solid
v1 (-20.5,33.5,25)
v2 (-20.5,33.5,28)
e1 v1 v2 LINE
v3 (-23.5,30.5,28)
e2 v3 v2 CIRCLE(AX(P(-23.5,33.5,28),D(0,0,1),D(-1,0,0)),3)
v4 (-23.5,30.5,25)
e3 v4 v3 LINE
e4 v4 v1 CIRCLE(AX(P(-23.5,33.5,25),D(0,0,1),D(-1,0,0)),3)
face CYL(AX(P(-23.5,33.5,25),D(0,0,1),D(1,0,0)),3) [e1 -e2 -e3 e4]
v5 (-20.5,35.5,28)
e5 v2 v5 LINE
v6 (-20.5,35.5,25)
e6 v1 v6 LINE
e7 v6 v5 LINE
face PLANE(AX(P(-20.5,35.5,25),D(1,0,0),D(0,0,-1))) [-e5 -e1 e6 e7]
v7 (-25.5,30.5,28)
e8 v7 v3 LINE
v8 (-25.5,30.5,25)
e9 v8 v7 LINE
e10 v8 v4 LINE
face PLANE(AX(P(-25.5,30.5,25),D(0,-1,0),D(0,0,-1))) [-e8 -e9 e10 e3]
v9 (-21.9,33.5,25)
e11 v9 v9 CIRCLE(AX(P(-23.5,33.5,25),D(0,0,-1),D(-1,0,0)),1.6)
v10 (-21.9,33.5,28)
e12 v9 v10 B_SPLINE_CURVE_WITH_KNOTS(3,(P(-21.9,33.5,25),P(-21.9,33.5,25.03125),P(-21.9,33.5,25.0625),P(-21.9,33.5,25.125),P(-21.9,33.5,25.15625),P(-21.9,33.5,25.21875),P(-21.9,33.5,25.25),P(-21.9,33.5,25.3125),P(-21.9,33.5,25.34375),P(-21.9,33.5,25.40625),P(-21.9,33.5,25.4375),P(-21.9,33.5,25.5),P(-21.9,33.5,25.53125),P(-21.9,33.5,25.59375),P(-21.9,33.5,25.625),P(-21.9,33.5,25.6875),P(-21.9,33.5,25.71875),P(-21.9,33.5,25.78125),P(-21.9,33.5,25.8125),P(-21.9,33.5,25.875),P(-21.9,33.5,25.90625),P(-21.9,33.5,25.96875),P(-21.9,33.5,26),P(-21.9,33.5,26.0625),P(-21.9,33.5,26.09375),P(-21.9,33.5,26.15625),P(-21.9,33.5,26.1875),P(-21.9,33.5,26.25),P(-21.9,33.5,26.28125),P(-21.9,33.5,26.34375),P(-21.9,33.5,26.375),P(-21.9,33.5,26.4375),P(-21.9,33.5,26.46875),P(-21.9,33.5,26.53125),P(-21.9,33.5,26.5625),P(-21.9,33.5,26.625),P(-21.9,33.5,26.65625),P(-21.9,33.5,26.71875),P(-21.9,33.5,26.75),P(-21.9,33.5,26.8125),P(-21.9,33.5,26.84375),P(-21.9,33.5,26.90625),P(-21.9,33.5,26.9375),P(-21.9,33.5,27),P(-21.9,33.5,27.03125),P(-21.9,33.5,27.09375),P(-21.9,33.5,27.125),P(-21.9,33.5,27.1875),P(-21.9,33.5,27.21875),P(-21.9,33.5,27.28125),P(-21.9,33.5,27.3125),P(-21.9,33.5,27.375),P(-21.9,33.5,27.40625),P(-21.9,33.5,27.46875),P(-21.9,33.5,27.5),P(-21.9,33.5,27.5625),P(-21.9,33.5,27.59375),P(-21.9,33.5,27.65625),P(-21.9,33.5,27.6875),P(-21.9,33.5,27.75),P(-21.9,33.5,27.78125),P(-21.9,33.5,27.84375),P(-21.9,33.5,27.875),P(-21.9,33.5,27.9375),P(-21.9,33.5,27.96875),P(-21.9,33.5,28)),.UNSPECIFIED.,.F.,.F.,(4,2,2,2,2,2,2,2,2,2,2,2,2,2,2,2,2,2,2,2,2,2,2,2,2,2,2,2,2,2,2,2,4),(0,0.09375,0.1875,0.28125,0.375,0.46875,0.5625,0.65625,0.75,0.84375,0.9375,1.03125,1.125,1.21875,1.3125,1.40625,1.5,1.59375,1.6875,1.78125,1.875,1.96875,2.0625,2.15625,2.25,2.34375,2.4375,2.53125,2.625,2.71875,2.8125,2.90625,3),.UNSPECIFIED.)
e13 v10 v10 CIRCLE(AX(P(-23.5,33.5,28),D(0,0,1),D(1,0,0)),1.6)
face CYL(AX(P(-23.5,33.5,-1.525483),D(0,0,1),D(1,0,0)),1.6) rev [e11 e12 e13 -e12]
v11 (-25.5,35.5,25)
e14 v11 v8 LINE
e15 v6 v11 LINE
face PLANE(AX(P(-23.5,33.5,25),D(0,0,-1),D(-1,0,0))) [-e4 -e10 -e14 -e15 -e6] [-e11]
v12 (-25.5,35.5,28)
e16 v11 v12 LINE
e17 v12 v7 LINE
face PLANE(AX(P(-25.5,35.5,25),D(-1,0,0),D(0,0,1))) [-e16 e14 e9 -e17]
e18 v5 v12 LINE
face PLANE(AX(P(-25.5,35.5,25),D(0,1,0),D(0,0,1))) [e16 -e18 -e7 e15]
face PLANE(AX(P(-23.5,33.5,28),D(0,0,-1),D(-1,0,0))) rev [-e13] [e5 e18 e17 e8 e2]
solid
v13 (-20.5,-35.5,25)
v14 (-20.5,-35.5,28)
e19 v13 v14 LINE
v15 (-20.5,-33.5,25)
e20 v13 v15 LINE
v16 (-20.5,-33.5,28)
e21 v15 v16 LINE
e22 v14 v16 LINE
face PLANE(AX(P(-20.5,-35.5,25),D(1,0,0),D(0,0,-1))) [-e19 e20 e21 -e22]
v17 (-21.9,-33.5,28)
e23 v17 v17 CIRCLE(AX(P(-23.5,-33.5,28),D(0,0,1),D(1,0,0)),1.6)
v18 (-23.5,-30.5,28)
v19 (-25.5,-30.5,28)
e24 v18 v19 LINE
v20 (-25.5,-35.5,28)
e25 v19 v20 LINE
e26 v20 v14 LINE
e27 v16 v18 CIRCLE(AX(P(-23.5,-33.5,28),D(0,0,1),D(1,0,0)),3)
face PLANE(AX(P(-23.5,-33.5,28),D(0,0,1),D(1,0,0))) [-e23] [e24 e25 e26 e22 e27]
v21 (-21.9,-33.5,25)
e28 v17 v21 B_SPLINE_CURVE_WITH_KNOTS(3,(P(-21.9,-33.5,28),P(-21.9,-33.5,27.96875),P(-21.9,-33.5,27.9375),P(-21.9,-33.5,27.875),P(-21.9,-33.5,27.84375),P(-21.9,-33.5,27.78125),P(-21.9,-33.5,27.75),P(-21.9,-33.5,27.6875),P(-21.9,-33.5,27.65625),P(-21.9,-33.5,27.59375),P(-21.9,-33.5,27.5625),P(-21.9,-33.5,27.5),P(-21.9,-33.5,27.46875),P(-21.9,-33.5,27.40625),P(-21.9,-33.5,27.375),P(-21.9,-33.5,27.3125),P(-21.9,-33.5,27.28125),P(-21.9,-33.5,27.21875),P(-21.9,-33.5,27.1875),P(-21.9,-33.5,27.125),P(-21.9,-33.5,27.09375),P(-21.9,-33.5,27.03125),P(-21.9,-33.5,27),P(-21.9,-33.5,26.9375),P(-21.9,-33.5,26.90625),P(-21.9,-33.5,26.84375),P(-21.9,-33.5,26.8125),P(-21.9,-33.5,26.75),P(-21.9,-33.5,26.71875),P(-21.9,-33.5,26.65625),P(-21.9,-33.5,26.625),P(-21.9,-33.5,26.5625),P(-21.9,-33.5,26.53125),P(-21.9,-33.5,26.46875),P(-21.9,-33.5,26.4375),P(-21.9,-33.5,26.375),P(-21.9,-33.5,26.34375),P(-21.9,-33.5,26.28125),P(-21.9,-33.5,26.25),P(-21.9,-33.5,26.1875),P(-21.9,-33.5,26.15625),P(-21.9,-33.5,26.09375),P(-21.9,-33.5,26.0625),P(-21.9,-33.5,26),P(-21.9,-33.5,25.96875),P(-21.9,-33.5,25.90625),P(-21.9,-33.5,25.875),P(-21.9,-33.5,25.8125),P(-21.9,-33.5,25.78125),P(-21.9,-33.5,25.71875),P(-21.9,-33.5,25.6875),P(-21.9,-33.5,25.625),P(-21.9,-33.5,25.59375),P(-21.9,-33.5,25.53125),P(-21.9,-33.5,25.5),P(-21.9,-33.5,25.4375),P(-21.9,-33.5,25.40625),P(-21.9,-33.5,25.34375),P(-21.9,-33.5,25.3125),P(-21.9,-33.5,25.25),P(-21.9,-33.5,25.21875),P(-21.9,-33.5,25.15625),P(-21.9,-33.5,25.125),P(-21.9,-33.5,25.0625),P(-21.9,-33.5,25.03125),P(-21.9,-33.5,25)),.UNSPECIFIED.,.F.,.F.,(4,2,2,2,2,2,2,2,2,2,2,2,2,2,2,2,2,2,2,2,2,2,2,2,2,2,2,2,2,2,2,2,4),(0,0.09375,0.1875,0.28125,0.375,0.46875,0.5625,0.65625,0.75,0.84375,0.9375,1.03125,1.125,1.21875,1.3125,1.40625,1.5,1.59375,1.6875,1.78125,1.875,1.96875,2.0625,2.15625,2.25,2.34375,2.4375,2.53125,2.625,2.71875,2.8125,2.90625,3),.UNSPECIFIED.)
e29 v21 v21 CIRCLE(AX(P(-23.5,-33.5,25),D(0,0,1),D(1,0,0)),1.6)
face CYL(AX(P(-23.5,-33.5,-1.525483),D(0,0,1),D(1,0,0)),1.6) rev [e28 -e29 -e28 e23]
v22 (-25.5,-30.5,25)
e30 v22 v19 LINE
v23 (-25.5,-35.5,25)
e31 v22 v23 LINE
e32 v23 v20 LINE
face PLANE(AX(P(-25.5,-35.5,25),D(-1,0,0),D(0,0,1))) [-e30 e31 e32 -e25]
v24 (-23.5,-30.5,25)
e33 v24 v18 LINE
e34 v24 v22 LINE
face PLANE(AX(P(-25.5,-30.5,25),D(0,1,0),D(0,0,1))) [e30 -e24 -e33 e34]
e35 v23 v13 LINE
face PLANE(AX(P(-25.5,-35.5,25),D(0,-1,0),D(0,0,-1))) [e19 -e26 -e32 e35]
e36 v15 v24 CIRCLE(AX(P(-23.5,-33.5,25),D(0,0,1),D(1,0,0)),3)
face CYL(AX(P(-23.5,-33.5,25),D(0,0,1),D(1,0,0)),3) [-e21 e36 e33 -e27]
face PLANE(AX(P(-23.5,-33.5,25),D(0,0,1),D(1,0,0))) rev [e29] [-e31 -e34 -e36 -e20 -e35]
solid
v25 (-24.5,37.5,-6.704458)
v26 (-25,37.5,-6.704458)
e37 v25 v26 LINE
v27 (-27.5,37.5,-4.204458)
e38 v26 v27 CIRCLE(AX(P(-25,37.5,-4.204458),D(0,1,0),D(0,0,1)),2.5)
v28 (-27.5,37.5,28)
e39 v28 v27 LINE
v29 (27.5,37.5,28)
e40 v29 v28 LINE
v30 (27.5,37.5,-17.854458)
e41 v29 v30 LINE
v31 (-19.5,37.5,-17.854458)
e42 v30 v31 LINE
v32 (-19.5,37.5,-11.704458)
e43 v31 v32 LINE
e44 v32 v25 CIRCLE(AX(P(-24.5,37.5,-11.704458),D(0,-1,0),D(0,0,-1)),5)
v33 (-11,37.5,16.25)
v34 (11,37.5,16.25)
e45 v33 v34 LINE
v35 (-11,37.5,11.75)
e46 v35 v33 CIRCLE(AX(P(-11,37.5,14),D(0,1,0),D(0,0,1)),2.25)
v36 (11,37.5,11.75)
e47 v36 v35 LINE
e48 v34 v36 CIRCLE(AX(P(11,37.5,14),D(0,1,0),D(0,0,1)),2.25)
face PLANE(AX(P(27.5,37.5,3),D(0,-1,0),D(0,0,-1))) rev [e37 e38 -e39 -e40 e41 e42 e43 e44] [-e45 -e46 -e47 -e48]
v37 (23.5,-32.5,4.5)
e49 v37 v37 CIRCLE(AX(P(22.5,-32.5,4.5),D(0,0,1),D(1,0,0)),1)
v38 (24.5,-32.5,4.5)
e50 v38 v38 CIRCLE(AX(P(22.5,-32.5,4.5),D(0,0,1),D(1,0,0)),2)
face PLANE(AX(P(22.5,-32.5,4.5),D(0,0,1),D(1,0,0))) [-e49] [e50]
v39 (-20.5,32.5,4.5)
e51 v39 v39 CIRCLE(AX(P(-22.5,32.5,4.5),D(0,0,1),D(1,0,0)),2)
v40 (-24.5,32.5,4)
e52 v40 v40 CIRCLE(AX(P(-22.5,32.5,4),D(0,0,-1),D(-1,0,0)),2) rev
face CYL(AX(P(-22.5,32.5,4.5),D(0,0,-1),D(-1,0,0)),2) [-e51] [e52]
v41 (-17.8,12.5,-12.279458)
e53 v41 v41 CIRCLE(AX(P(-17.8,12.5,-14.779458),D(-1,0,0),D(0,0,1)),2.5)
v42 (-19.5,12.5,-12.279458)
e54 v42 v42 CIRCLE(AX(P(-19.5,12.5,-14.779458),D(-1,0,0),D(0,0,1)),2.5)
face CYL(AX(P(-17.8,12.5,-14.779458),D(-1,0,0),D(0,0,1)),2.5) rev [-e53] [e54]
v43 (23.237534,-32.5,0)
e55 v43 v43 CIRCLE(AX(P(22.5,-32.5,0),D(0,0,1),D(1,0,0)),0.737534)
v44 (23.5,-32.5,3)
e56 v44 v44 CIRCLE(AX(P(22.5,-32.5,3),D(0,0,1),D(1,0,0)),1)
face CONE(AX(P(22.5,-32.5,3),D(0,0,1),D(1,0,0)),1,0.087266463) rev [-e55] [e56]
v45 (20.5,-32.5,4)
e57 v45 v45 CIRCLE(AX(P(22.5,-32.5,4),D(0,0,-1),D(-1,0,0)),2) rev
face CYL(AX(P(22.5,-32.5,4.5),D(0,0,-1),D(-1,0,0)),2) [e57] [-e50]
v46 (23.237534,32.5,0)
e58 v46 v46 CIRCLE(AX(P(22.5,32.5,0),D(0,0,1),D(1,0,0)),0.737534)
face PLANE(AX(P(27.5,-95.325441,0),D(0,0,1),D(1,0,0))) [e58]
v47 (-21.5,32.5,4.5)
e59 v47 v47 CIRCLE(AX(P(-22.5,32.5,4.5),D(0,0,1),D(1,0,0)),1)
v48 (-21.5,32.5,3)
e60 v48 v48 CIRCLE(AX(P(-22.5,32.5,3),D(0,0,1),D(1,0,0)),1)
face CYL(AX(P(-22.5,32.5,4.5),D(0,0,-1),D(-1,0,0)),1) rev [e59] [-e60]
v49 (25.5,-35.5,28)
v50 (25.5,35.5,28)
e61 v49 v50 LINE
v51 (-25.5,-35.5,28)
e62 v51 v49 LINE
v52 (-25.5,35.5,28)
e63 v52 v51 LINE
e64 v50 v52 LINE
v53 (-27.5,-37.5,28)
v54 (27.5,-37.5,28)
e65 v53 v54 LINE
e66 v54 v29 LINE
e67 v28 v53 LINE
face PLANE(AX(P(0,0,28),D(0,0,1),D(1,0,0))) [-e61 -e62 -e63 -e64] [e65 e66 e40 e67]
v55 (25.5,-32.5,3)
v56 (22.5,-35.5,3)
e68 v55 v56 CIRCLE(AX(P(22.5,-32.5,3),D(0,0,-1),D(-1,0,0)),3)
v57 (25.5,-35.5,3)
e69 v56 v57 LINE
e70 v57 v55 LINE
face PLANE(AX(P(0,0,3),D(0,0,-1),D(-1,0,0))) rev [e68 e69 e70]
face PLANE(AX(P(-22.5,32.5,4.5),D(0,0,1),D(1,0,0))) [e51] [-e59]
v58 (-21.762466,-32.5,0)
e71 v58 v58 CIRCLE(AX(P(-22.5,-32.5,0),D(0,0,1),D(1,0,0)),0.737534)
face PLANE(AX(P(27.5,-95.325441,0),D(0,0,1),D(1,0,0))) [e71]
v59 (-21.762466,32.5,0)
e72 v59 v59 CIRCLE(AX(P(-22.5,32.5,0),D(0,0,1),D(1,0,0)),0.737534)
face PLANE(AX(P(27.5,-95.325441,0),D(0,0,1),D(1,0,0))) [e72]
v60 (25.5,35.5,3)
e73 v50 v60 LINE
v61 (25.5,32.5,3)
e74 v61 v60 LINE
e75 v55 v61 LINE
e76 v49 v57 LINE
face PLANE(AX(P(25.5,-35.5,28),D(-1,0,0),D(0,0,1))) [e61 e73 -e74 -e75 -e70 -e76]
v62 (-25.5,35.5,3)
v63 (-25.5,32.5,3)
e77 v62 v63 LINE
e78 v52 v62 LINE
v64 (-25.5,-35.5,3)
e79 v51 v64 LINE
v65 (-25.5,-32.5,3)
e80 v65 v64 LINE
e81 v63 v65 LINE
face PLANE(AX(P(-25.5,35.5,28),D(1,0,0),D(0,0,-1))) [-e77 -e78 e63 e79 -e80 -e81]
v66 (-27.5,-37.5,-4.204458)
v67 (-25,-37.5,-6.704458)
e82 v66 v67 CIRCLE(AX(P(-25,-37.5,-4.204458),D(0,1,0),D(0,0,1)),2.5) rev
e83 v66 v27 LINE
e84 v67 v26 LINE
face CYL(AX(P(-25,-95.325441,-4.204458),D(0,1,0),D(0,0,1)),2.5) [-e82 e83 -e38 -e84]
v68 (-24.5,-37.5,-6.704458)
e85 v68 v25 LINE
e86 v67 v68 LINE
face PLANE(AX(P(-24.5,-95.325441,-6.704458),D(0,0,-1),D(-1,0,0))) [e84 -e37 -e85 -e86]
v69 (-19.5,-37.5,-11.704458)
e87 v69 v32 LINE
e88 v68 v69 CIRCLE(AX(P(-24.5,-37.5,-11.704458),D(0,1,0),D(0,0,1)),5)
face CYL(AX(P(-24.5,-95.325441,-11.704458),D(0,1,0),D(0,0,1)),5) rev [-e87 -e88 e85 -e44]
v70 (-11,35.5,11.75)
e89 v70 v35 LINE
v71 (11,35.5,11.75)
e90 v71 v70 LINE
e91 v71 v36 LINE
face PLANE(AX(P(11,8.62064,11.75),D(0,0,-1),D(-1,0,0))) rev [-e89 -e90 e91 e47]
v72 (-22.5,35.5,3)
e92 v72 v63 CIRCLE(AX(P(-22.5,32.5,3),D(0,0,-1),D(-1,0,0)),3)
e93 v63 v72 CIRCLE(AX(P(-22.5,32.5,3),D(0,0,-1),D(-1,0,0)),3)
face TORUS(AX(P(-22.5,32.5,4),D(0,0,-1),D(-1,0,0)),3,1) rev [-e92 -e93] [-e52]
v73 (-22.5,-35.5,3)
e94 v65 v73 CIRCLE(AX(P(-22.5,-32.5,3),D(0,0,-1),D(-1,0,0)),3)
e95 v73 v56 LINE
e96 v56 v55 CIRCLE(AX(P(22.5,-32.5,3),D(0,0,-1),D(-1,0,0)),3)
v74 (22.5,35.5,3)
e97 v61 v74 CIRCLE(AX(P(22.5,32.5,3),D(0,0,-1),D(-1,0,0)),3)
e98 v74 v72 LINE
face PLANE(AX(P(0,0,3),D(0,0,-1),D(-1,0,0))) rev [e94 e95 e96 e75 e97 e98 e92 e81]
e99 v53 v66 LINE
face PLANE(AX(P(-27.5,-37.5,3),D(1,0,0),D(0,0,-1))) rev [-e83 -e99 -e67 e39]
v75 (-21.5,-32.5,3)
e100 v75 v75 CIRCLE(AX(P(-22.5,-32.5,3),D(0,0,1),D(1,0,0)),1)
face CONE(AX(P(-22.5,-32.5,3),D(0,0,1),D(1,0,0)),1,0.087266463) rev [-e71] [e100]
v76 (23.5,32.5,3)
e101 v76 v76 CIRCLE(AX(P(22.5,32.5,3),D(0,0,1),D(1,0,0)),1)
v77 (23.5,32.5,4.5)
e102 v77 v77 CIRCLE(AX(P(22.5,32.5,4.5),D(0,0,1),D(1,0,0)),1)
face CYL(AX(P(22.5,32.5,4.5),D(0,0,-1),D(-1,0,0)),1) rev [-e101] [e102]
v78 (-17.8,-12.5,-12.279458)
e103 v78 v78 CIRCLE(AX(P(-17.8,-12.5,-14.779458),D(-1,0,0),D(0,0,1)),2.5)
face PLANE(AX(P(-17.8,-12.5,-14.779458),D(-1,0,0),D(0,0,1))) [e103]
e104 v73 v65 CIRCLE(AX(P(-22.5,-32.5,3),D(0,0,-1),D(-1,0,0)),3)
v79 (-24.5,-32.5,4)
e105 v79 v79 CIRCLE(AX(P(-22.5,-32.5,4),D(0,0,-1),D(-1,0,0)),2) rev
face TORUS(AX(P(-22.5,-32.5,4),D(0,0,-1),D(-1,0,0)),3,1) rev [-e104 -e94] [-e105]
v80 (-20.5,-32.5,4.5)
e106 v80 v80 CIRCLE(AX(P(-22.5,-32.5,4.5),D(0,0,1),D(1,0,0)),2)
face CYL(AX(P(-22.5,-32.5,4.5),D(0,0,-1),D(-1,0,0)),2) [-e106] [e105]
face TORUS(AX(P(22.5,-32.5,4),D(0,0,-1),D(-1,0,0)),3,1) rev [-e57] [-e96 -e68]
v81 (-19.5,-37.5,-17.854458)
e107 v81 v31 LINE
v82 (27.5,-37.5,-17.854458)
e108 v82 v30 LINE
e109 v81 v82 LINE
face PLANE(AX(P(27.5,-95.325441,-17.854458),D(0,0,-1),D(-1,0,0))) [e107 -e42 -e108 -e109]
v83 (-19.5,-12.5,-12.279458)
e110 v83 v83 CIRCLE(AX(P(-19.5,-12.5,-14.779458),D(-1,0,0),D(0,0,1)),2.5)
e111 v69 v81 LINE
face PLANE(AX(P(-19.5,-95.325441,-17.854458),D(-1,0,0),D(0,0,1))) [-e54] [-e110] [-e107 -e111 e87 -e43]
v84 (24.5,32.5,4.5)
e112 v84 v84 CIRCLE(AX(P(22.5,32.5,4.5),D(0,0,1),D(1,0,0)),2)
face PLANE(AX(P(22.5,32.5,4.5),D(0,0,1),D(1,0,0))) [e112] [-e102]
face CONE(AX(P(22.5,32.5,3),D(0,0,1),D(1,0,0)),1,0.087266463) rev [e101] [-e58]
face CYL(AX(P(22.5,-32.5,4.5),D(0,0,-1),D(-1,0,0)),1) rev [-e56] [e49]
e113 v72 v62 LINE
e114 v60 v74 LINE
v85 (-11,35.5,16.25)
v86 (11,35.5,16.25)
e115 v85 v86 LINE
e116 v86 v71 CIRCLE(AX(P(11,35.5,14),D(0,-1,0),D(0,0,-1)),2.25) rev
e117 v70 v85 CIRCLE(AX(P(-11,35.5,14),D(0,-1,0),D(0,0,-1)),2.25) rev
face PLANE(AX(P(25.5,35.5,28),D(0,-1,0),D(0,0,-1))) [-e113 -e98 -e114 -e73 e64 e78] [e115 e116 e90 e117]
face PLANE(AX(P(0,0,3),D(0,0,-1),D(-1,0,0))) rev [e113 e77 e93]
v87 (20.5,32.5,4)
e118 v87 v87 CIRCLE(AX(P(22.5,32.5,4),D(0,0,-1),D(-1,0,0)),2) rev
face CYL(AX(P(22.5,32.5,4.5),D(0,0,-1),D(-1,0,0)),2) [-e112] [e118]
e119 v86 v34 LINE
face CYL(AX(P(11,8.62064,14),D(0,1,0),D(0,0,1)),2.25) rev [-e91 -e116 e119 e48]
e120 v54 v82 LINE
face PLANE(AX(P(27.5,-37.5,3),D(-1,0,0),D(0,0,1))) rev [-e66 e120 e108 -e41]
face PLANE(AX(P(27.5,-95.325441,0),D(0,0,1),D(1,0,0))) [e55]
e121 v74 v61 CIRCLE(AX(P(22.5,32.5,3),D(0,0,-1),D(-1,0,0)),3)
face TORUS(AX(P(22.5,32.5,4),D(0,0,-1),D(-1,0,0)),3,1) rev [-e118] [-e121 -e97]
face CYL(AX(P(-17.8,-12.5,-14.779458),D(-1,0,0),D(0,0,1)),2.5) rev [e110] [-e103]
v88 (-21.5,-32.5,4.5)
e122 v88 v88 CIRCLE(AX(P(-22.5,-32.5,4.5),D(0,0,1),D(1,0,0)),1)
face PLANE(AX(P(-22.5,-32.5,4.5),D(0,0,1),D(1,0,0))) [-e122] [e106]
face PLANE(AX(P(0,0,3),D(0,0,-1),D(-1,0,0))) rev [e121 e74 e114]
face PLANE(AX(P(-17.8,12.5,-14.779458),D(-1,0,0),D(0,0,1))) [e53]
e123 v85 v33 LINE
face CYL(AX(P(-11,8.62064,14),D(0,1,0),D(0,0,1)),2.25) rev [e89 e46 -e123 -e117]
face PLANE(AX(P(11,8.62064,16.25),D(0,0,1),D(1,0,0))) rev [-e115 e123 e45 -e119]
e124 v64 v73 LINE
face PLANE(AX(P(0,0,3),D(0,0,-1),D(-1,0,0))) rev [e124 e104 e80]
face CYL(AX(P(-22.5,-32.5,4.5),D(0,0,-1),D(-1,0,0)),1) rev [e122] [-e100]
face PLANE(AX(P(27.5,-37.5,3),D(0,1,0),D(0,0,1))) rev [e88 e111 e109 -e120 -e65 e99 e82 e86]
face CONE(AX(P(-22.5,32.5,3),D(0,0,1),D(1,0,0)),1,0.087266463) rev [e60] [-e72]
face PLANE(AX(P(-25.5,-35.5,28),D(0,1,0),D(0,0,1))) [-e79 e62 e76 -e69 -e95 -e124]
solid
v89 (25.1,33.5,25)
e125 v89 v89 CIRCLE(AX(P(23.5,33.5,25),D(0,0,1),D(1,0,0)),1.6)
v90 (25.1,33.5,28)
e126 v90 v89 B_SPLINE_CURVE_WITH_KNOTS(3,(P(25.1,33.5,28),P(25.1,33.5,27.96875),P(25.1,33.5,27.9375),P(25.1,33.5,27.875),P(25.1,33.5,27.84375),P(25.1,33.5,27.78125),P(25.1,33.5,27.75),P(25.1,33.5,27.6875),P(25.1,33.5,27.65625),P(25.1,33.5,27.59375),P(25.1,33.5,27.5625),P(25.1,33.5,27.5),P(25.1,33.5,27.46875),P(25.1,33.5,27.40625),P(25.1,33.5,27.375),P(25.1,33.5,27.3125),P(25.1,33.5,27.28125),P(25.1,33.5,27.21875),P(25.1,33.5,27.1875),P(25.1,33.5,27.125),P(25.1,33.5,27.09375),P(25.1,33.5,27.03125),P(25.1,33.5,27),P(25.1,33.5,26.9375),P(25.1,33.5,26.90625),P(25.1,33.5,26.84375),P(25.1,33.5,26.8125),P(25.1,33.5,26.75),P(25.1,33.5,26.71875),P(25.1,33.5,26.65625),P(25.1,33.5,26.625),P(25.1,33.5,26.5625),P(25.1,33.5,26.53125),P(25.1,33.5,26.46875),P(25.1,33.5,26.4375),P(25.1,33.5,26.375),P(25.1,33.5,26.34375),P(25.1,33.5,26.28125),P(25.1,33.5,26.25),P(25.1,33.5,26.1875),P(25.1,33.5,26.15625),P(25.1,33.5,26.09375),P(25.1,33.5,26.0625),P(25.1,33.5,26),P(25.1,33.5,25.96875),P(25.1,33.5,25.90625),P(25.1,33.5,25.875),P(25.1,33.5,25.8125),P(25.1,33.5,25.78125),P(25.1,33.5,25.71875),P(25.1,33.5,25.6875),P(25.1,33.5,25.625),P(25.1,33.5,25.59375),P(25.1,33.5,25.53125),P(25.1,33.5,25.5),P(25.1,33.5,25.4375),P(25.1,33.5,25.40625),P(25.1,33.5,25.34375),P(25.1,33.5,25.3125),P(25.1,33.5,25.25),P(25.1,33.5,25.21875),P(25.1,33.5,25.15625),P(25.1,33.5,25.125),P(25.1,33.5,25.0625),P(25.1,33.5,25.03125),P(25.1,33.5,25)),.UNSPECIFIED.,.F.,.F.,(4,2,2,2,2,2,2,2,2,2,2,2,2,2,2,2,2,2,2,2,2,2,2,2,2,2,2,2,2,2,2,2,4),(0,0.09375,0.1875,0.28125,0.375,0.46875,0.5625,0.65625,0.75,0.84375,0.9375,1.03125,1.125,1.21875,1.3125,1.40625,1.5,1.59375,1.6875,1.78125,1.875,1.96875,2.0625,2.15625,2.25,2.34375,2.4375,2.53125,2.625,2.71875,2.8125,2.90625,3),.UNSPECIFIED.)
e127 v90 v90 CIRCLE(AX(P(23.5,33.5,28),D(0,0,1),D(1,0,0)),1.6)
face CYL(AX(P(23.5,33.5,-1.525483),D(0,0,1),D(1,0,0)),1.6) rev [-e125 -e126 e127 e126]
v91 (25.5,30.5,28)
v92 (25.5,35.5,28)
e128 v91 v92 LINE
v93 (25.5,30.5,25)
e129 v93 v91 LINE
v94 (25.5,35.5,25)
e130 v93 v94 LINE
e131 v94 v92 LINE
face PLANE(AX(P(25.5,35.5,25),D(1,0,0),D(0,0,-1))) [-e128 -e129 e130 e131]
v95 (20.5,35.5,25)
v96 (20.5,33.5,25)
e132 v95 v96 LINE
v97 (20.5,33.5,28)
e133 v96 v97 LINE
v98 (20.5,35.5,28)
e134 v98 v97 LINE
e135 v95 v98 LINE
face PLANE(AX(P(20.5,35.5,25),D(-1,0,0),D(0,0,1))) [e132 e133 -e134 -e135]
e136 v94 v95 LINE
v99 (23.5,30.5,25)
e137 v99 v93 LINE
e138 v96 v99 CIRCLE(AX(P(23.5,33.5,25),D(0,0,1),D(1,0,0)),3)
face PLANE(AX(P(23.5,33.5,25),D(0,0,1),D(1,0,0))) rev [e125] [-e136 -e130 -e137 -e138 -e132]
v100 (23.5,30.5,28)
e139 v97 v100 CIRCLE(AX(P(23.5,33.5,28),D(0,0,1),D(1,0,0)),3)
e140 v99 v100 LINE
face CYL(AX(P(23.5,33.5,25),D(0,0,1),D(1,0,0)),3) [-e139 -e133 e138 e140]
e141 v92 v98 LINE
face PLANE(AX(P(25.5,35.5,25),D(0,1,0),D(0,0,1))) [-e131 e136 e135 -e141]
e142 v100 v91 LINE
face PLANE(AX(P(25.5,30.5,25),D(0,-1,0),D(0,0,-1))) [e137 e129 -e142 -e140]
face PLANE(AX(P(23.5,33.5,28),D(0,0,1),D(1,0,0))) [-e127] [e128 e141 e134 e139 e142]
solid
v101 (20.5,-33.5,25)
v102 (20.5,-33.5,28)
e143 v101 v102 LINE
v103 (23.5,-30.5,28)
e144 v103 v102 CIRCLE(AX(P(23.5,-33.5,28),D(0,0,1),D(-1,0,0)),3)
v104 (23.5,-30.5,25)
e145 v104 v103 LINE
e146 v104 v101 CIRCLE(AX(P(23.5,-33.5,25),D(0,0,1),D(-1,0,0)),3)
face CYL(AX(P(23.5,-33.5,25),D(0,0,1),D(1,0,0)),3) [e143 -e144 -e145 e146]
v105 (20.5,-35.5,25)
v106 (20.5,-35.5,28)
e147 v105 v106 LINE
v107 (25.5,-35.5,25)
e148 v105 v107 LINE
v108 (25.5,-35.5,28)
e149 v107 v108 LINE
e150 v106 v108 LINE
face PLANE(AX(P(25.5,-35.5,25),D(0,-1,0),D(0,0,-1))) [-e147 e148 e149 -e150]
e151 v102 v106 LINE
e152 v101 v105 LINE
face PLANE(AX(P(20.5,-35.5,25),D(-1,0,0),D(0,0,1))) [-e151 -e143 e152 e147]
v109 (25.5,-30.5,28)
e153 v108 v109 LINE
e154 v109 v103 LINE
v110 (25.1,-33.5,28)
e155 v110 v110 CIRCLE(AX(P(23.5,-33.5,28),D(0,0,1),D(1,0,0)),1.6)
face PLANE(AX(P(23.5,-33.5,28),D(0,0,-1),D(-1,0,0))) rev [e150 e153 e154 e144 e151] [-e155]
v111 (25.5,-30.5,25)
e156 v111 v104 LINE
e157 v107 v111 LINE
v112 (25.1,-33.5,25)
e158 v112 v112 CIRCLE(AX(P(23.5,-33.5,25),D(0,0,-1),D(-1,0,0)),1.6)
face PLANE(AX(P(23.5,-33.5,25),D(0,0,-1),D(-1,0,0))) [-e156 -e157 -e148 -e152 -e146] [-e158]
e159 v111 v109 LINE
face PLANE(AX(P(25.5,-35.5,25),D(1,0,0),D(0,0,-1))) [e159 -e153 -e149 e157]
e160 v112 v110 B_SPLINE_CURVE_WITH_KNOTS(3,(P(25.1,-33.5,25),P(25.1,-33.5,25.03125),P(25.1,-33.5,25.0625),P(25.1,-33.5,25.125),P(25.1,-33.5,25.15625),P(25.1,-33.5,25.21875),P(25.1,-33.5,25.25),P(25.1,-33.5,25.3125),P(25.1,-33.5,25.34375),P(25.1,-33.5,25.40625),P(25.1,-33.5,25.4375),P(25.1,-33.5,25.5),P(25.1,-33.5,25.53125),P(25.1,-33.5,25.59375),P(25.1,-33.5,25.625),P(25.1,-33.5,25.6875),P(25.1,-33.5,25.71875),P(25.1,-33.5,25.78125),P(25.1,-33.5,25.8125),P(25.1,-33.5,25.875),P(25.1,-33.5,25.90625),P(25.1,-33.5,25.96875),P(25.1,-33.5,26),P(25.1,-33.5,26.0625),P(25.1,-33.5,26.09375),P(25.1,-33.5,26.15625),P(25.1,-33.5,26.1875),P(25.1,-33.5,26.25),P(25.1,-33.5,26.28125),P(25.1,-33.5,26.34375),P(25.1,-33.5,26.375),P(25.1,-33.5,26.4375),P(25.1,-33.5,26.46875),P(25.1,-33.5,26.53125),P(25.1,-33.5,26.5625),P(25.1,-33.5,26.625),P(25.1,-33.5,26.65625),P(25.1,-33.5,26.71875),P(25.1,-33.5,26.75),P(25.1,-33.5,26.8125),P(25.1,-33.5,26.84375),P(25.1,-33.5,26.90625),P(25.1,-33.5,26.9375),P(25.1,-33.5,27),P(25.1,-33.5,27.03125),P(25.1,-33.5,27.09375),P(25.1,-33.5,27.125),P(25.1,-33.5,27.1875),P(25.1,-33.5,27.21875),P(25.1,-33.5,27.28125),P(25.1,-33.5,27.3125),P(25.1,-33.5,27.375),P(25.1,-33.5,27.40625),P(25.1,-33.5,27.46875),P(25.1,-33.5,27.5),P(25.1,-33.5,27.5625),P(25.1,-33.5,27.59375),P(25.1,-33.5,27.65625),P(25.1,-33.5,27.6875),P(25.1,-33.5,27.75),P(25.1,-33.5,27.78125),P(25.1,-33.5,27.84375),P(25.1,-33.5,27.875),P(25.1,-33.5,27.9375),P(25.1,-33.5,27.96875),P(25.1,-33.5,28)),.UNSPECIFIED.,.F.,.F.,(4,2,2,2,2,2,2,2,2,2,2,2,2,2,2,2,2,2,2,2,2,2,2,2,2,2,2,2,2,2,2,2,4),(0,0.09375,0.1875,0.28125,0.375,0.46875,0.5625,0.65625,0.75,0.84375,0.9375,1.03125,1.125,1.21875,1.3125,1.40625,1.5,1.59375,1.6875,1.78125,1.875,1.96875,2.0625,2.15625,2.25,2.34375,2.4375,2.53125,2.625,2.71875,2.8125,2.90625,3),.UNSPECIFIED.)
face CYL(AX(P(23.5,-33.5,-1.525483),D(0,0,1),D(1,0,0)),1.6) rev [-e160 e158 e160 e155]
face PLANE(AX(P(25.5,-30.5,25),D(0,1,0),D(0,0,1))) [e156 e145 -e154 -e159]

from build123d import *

# Parameters (mm, degrees)
SKETCH1_W             = 75
SKETCH1_H             = 55
BOSS_EXTRUDE1_DEPTH   = 3
SKETCH3_W             = 55
SKETCH3_H             = 75
SKETCH3_W_2           = 51
SKETCH3_H_2           = 71
BOSS_EXTRUDE2_DEPTH   = 25
BOSS_EXTRUDE4_DEPTH   = 3
BOSS_EXTRUDE4_2_DEPTH = 3
BOSS_EXTRUDE4_3_DEPTH = 3
BOSS_EXTRUDE4_4_DEPTH = 3
SKETCH5_R             = 1.6
CUT_EXTRUDE2_DEPTH    = 25
CUT_EXTRUDE4_DEPTH    = 2
BOSS_EXTRUDE6_DEPTH   = 75
SKETCH11_R            = 2.5
CUT_EXTRUDE5_DEPTH    = 1.7
SKETCH12_R            = 2
SKETCH12_R_2          = 1
BOSS_EXTRUDE8_DEPTH   = 1.5
FILLET2_R             = 1


with BuildPart() as part:
    # Sketch1 → Boss-Extrude1 (new body)
    with BuildSketch(Plane(origin=(0, 0, 0), x_dir=(0, 1, 0), z_dir=(0, 0, 1))):
        Rectangle(SKETCH1_W, SKETCH1_H)
    extrude(amount=BOSS_EXTRUDE1_DEPTH)

    # Cut-Extrude1 cone 1 section (through the dimple's axis) → Cut-Extrude1 (revolve, cut)
    with BuildSketch(Plane(origin=(-22.5, 32.5, 3), x_dir=(0, -1, 0), z_dir=(1, 0, 0))):
        Polygon((0, 0), (1, 0), (0, 11.430052303), align=None)
    revolve(axis=Axis((-22.5, 32.5, 3), (0, 0, -1)), mode=Mode.SUBTRACT)

    # Cut-Extrude1 cone 2 section (through the dimple's axis) → Cut-Extrude1 cone 2 (revolve, cut)
    with BuildSketch(Plane(origin=(22.5, 32.5, 3), x_dir=(0, -1, 0), z_dir=(1, 0, 0))):
        Polygon((0, 0), (1, 0), (0, 11.430052303), align=None)
    revolve(axis=Axis((22.5, 32.5, 3), (0, 0, -1)), mode=Mode.SUBTRACT)

    # Cut-Extrude1 cone 3 section (through the dimple's axis) → Cut-Extrude1 cone 3 (revolve, cut)
    with BuildSketch(Plane(origin=(-22.5, -32.5, 3), x_dir=(0, -1, 0), z_dir=(1, 0, 0))):
        Polygon((0, 0), (1, 0), (0, 11.430052303), align=None)
    revolve(axis=Axis((-22.5, -32.5, 3), (0, 0, -1)), mode=Mode.SUBTRACT)

    # Cut-Extrude1 cone 4 section (through the dimple's axis) → Cut-Extrude1 cone 4 (revolve, cut)
    with BuildSketch(Plane(origin=(22.5, -32.5, 3), x_dir=(0, -1, 0), z_dir=(1, 0, 0))):
        Polygon((0, 0), (1, 0), (0, 11.430052303), align=None)
    revolve(axis=Axis((22.5, -32.5, 3), (0, 0, -1)), mode=Mode.SUBTRACT)

    # Sketch3 → Boss-Extrude2 (add)
    with BuildSketch(Plane.XY.offset(3)):
        Rectangle(SKETCH3_W, SKETCH3_H)
        Rectangle(SKETCH3_W_2, SKETCH3_H_2, mode=Mode.SUBTRACT)
    extrude(amount=BOSS_EXTRUDE2_DEPTH)

    # Sketch8 → Cut-Extrude4 (cut)
    with BuildSketch(Plane(origin=(0, 37.5, 0), x_dir=(-1, 0, 0), z_dir=(0, 1, 0))):
        with BuildLine():
            Line((-11, 16.25), (11, 16.25))
            ThreePointArc((11, 16.25), (13.25, 14), (11, 11.75))
            Line((11, 11.75), (-11, 11.75))
            ThreePointArc((-11, 11.75), (-13.25, 14), (-11, 16.25))
        make_face()
    extrude(amount=-CUT_EXTRUDE4_DEPTH, mode=Mode.SUBTRACT)

    # Sketch10 → Boss-Extrude6 (add)
    with BuildSketch(Plane(origin=(0, 37.5, 0), x_dir=(-1, 0, 0), z_dir=(0, 1, 0))):
        with BuildLine():
            Line((-27.5, 0), (27.5, 0))
            Line((27.5, 0), (27.5, -4.204457527))
            ThreePointArc((27.5, -4.204457527), (26.767766953, -5.97222448), (25, -6.704457527))
            Line((25, -6.704457527), (24.5, -6.704457527))
            ThreePointArc((24.5, -6.704457527), (20.964466094, -8.168923621), (19.5, -11.704457527))
            Line((19.5, -11.704457527), (19.5, -17.854457527))
            Line((19.5, -17.854457527), (-27.5, -17.854457527))
            Line((-27.5, -17.854457527), (-27.5, 0))
        make_face()
    extrude(amount=-BOSS_EXTRUDE6_DEPTH)

    # Sketch11 → Cut-Extrude5 (cut)
    with BuildSketch(Plane(origin=(-19.5, 0, 0), x_dir=(0, -1, 0), z_dir=(-1, 0, 0))):
        with Locations(Location((-12.5, -14.779457527, 0), (0, 0, 90))):
            Circle(SKETCH11_R)
        with Locations(Location((12.5, -14.779457527, 0), (0, 0, 90))):
            Circle(SKETCH11_R)
    extrude(amount=-CUT_EXTRUDE5_DEPTH, mode=Mode.SUBTRACT)

    # Sketch12 → Boss-Extrude8 (add)
    # profile 1 of 4: a face of its own
    with BuildSketch(Plane.XY.offset(3)):
        with Locations(Location((22.5, -32.5, 0), (0, 0, 180))):
            Circle(SKETCH12_R)
        with Locations((22.5, -32.5)):
            Circle(SKETCH12_R_2, mode=Mode.SUBTRACT)
    # profile 2 of 4: a face of its own
    with BuildSketch(Plane.XY.offset(3)):
        with Locations(Location((22.5, 32.5, 0), (0, 0, 180))):
            Circle(SKETCH12_R)
        with Locations((22.5, 32.5)):
            Circle(SKETCH12_R_2, mode=Mode.SUBTRACT)
    # profile 3 of 4: a face of its own
    with BuildSketch(Plane.XY.offset(3)):
        with Locations(Location((-22.5, 32.5, 0), (0, 0, 180))):
            Circle(SKETCH12_R)
        with Locations((-22.5, 32.5)):
            Circle(SKETCH12_R_2, mode=Mode.SUBTRACT)
    # profile 4 of 4: a face of its own
    with BuildSketch(Plane.XY.offset(3)):
        with Locations(Location((-22.5, -32.5, 0), (0, 0, 180))):
            Circle(SKETCH12_R)
        with Locations((-22.5, -32.5)):
            Circle(SKETCH12_R_2, mode=Mode.SUBTRACT)
    extrude(amount=BOSS_EXTRUDE8_DEPTH)

    # Fillet2
    fillet2_edges = [part.edges().sort_by_distance(p)[0] for p in [
        (24.5, -32.5, 3),
        (24.5, 32.5, 3),
        (-20.5, 32.5, 3),
        (-20.5, -32.5, 3),
    ]]
    fillet(fillet2_edges, radius=FILLET2_R - 0.0001)  # a hair under: the kernel refuses the full size


with BuildPart() as body_2:
    # Sketch4 → Boss-Extrude4 (new body)
    with BuildSketch(Plane(origin=(0, 0, 28), x_dir=(0, -1, 0), z_dir=(0, 0, 1))):
        with BuildLine():
            Line((-35.5, 25.5), (-30.5, 25.5))
            Line((-30.5, 25.5), (-30.5, 23.5))
            ThreePointArc((-30.5, 23.5), (-31.378679656, 21.378679656), (-33.5, 20.5))
            Line((-33.5, 20.5), (-35.5, 20.5))
            Line((-35.5, 20.5), (-35.5, 25.5))
        make_face()
    extrude(amount=-BOSS_EXTRUDE4_DEPTH)


with BuildPart() as body_3:
    # Sketch4 → Boss-Extrude4 2 (new body)
    with BuildSketch(Plane(origin=(0, 0, 28), x_dir=(0, -1, 0), z_dir=(0, 0, 1))):
        with BuildLine():
            Line((35.5, 20.5), (33.5, 20.5))
            ThreePointArc((33.5, 20.5), (31.378679656, 21.378679656), (30.5, 23.5))
            Line((30.5, 23.5), (30.5, 25.5))
            Line((30.5, 25.5), (35.5, 25.5))
            Line((35.5, 25.5), (35.5, 20.5))
        make_face()
    extrude(amount=-BOSS_EXTRUDE4_2_DEPTH)


with BuildPart() as body_4:
    # Sketch4 → Boss-Extrude4 3 (new body)
    with BuildSketch(Plane(origin=(0, 0, 28), x_dir=(0, -1, 0), z_dir=(0, 0, 1))):
        with BuildLine():
            Line((35.5, -25.5), (35.5, -20.5))
            Line((35.5, -20.5), (33.5, -20.5))
            ThreePointArc((33.5, -20.5), (31.378679656, -21.378679656), (30.5, -23.5))
            Line((30.5, -23.5), (30.5, -25.5))
            Line((30.5, -25.5), (35.5, -25.5))
        make_face()
    extrude(amount=-BOSS_EXTRUDE4_3_DEPTH)


with BuildPart() as body_5:
    # Sketch4 → Boss-Extrude4 4 (new body)
    with BuildSketch(Plane(origin=(0, 0, 28), x_dir=(0, -1, 0), z_dir=(0, 0, 1))):
        with BuildLine():
            Line((-35.5, -20.5), (-33.5, -20.5))
            ThreePointArc((-33.5, -20.5), (-31.378679656, -21.378679656), (-30.5, -23.5))
            Line((-30.5, -23.5), (-30.5, -25.5))
            Line((-30.5, -25.5), (-35.5, -25.5))
            Line((-35.5, -25.5), (-35.5, -20.5))
        make_face()
    extrude(amount=-BOSS_EXTRUDE4_4_DEPTH)


with BuildPart() as cut_extrude2_tool:
    # Sketch5 → Cut-Extrude2 (new body)
    with BuildSketch(Plane(origin=(0, 0, 28), x_dir=(0, -1, 0), z_dir=(0, 0, 1))):
        with Locations(Location((-33.5, 23.5, 0), (0, 0, 90))):
            Circle(SKETCH5_R)
        with Locations(Location((-33.5, -23.5, 0), (0, 0, 90))):
            Circle(SKETCH5_R)
        with Locations(Location((33.5, -23.5, 0), (0, 0, 90))):
            Circle(SKETCH5_R)
        with Locations(Location((33.5, 23.5, 0), (0, 0, 90))):
            Circle(SKETCH5_R)
    extrude(amount=-CUT_EXTRUDE2_DEPTH)


with BuildPart() as body_2_1:
    add(body_2.part)

    # Cut-Extrude2: cut by cut_extrude2_tool
    add(cut_extrude2_tool.part, mode=Mode.SUBTRACT)


with BuildPart() as body_3_1:
    add(body_3.part)

    # Cut-Extrude2: cut by cut_extrude2_tool
    add(cut_extrude2_tool.part, mode=Mode.SUBTRACT)


with BuildPart() as body_4_1:
    add(body_4.part)

    # Cut-Extrude2: cut by cut_extrude2_tool
    add(cut_extrude2_tool.part, mode=Mode.SUBTRACT)


with BuildPart() as body_5_1:
    add(body_5.part)

    # Cut-Extrude2: cut by cut_extrude2_tool
    add(cut_extrude2_tool.part, mode=Mode.SUBTRACT)


solid = Compound([part.part, body_2_1.part, body_3_1.part, body_4_1.part, body_5_1.part])
